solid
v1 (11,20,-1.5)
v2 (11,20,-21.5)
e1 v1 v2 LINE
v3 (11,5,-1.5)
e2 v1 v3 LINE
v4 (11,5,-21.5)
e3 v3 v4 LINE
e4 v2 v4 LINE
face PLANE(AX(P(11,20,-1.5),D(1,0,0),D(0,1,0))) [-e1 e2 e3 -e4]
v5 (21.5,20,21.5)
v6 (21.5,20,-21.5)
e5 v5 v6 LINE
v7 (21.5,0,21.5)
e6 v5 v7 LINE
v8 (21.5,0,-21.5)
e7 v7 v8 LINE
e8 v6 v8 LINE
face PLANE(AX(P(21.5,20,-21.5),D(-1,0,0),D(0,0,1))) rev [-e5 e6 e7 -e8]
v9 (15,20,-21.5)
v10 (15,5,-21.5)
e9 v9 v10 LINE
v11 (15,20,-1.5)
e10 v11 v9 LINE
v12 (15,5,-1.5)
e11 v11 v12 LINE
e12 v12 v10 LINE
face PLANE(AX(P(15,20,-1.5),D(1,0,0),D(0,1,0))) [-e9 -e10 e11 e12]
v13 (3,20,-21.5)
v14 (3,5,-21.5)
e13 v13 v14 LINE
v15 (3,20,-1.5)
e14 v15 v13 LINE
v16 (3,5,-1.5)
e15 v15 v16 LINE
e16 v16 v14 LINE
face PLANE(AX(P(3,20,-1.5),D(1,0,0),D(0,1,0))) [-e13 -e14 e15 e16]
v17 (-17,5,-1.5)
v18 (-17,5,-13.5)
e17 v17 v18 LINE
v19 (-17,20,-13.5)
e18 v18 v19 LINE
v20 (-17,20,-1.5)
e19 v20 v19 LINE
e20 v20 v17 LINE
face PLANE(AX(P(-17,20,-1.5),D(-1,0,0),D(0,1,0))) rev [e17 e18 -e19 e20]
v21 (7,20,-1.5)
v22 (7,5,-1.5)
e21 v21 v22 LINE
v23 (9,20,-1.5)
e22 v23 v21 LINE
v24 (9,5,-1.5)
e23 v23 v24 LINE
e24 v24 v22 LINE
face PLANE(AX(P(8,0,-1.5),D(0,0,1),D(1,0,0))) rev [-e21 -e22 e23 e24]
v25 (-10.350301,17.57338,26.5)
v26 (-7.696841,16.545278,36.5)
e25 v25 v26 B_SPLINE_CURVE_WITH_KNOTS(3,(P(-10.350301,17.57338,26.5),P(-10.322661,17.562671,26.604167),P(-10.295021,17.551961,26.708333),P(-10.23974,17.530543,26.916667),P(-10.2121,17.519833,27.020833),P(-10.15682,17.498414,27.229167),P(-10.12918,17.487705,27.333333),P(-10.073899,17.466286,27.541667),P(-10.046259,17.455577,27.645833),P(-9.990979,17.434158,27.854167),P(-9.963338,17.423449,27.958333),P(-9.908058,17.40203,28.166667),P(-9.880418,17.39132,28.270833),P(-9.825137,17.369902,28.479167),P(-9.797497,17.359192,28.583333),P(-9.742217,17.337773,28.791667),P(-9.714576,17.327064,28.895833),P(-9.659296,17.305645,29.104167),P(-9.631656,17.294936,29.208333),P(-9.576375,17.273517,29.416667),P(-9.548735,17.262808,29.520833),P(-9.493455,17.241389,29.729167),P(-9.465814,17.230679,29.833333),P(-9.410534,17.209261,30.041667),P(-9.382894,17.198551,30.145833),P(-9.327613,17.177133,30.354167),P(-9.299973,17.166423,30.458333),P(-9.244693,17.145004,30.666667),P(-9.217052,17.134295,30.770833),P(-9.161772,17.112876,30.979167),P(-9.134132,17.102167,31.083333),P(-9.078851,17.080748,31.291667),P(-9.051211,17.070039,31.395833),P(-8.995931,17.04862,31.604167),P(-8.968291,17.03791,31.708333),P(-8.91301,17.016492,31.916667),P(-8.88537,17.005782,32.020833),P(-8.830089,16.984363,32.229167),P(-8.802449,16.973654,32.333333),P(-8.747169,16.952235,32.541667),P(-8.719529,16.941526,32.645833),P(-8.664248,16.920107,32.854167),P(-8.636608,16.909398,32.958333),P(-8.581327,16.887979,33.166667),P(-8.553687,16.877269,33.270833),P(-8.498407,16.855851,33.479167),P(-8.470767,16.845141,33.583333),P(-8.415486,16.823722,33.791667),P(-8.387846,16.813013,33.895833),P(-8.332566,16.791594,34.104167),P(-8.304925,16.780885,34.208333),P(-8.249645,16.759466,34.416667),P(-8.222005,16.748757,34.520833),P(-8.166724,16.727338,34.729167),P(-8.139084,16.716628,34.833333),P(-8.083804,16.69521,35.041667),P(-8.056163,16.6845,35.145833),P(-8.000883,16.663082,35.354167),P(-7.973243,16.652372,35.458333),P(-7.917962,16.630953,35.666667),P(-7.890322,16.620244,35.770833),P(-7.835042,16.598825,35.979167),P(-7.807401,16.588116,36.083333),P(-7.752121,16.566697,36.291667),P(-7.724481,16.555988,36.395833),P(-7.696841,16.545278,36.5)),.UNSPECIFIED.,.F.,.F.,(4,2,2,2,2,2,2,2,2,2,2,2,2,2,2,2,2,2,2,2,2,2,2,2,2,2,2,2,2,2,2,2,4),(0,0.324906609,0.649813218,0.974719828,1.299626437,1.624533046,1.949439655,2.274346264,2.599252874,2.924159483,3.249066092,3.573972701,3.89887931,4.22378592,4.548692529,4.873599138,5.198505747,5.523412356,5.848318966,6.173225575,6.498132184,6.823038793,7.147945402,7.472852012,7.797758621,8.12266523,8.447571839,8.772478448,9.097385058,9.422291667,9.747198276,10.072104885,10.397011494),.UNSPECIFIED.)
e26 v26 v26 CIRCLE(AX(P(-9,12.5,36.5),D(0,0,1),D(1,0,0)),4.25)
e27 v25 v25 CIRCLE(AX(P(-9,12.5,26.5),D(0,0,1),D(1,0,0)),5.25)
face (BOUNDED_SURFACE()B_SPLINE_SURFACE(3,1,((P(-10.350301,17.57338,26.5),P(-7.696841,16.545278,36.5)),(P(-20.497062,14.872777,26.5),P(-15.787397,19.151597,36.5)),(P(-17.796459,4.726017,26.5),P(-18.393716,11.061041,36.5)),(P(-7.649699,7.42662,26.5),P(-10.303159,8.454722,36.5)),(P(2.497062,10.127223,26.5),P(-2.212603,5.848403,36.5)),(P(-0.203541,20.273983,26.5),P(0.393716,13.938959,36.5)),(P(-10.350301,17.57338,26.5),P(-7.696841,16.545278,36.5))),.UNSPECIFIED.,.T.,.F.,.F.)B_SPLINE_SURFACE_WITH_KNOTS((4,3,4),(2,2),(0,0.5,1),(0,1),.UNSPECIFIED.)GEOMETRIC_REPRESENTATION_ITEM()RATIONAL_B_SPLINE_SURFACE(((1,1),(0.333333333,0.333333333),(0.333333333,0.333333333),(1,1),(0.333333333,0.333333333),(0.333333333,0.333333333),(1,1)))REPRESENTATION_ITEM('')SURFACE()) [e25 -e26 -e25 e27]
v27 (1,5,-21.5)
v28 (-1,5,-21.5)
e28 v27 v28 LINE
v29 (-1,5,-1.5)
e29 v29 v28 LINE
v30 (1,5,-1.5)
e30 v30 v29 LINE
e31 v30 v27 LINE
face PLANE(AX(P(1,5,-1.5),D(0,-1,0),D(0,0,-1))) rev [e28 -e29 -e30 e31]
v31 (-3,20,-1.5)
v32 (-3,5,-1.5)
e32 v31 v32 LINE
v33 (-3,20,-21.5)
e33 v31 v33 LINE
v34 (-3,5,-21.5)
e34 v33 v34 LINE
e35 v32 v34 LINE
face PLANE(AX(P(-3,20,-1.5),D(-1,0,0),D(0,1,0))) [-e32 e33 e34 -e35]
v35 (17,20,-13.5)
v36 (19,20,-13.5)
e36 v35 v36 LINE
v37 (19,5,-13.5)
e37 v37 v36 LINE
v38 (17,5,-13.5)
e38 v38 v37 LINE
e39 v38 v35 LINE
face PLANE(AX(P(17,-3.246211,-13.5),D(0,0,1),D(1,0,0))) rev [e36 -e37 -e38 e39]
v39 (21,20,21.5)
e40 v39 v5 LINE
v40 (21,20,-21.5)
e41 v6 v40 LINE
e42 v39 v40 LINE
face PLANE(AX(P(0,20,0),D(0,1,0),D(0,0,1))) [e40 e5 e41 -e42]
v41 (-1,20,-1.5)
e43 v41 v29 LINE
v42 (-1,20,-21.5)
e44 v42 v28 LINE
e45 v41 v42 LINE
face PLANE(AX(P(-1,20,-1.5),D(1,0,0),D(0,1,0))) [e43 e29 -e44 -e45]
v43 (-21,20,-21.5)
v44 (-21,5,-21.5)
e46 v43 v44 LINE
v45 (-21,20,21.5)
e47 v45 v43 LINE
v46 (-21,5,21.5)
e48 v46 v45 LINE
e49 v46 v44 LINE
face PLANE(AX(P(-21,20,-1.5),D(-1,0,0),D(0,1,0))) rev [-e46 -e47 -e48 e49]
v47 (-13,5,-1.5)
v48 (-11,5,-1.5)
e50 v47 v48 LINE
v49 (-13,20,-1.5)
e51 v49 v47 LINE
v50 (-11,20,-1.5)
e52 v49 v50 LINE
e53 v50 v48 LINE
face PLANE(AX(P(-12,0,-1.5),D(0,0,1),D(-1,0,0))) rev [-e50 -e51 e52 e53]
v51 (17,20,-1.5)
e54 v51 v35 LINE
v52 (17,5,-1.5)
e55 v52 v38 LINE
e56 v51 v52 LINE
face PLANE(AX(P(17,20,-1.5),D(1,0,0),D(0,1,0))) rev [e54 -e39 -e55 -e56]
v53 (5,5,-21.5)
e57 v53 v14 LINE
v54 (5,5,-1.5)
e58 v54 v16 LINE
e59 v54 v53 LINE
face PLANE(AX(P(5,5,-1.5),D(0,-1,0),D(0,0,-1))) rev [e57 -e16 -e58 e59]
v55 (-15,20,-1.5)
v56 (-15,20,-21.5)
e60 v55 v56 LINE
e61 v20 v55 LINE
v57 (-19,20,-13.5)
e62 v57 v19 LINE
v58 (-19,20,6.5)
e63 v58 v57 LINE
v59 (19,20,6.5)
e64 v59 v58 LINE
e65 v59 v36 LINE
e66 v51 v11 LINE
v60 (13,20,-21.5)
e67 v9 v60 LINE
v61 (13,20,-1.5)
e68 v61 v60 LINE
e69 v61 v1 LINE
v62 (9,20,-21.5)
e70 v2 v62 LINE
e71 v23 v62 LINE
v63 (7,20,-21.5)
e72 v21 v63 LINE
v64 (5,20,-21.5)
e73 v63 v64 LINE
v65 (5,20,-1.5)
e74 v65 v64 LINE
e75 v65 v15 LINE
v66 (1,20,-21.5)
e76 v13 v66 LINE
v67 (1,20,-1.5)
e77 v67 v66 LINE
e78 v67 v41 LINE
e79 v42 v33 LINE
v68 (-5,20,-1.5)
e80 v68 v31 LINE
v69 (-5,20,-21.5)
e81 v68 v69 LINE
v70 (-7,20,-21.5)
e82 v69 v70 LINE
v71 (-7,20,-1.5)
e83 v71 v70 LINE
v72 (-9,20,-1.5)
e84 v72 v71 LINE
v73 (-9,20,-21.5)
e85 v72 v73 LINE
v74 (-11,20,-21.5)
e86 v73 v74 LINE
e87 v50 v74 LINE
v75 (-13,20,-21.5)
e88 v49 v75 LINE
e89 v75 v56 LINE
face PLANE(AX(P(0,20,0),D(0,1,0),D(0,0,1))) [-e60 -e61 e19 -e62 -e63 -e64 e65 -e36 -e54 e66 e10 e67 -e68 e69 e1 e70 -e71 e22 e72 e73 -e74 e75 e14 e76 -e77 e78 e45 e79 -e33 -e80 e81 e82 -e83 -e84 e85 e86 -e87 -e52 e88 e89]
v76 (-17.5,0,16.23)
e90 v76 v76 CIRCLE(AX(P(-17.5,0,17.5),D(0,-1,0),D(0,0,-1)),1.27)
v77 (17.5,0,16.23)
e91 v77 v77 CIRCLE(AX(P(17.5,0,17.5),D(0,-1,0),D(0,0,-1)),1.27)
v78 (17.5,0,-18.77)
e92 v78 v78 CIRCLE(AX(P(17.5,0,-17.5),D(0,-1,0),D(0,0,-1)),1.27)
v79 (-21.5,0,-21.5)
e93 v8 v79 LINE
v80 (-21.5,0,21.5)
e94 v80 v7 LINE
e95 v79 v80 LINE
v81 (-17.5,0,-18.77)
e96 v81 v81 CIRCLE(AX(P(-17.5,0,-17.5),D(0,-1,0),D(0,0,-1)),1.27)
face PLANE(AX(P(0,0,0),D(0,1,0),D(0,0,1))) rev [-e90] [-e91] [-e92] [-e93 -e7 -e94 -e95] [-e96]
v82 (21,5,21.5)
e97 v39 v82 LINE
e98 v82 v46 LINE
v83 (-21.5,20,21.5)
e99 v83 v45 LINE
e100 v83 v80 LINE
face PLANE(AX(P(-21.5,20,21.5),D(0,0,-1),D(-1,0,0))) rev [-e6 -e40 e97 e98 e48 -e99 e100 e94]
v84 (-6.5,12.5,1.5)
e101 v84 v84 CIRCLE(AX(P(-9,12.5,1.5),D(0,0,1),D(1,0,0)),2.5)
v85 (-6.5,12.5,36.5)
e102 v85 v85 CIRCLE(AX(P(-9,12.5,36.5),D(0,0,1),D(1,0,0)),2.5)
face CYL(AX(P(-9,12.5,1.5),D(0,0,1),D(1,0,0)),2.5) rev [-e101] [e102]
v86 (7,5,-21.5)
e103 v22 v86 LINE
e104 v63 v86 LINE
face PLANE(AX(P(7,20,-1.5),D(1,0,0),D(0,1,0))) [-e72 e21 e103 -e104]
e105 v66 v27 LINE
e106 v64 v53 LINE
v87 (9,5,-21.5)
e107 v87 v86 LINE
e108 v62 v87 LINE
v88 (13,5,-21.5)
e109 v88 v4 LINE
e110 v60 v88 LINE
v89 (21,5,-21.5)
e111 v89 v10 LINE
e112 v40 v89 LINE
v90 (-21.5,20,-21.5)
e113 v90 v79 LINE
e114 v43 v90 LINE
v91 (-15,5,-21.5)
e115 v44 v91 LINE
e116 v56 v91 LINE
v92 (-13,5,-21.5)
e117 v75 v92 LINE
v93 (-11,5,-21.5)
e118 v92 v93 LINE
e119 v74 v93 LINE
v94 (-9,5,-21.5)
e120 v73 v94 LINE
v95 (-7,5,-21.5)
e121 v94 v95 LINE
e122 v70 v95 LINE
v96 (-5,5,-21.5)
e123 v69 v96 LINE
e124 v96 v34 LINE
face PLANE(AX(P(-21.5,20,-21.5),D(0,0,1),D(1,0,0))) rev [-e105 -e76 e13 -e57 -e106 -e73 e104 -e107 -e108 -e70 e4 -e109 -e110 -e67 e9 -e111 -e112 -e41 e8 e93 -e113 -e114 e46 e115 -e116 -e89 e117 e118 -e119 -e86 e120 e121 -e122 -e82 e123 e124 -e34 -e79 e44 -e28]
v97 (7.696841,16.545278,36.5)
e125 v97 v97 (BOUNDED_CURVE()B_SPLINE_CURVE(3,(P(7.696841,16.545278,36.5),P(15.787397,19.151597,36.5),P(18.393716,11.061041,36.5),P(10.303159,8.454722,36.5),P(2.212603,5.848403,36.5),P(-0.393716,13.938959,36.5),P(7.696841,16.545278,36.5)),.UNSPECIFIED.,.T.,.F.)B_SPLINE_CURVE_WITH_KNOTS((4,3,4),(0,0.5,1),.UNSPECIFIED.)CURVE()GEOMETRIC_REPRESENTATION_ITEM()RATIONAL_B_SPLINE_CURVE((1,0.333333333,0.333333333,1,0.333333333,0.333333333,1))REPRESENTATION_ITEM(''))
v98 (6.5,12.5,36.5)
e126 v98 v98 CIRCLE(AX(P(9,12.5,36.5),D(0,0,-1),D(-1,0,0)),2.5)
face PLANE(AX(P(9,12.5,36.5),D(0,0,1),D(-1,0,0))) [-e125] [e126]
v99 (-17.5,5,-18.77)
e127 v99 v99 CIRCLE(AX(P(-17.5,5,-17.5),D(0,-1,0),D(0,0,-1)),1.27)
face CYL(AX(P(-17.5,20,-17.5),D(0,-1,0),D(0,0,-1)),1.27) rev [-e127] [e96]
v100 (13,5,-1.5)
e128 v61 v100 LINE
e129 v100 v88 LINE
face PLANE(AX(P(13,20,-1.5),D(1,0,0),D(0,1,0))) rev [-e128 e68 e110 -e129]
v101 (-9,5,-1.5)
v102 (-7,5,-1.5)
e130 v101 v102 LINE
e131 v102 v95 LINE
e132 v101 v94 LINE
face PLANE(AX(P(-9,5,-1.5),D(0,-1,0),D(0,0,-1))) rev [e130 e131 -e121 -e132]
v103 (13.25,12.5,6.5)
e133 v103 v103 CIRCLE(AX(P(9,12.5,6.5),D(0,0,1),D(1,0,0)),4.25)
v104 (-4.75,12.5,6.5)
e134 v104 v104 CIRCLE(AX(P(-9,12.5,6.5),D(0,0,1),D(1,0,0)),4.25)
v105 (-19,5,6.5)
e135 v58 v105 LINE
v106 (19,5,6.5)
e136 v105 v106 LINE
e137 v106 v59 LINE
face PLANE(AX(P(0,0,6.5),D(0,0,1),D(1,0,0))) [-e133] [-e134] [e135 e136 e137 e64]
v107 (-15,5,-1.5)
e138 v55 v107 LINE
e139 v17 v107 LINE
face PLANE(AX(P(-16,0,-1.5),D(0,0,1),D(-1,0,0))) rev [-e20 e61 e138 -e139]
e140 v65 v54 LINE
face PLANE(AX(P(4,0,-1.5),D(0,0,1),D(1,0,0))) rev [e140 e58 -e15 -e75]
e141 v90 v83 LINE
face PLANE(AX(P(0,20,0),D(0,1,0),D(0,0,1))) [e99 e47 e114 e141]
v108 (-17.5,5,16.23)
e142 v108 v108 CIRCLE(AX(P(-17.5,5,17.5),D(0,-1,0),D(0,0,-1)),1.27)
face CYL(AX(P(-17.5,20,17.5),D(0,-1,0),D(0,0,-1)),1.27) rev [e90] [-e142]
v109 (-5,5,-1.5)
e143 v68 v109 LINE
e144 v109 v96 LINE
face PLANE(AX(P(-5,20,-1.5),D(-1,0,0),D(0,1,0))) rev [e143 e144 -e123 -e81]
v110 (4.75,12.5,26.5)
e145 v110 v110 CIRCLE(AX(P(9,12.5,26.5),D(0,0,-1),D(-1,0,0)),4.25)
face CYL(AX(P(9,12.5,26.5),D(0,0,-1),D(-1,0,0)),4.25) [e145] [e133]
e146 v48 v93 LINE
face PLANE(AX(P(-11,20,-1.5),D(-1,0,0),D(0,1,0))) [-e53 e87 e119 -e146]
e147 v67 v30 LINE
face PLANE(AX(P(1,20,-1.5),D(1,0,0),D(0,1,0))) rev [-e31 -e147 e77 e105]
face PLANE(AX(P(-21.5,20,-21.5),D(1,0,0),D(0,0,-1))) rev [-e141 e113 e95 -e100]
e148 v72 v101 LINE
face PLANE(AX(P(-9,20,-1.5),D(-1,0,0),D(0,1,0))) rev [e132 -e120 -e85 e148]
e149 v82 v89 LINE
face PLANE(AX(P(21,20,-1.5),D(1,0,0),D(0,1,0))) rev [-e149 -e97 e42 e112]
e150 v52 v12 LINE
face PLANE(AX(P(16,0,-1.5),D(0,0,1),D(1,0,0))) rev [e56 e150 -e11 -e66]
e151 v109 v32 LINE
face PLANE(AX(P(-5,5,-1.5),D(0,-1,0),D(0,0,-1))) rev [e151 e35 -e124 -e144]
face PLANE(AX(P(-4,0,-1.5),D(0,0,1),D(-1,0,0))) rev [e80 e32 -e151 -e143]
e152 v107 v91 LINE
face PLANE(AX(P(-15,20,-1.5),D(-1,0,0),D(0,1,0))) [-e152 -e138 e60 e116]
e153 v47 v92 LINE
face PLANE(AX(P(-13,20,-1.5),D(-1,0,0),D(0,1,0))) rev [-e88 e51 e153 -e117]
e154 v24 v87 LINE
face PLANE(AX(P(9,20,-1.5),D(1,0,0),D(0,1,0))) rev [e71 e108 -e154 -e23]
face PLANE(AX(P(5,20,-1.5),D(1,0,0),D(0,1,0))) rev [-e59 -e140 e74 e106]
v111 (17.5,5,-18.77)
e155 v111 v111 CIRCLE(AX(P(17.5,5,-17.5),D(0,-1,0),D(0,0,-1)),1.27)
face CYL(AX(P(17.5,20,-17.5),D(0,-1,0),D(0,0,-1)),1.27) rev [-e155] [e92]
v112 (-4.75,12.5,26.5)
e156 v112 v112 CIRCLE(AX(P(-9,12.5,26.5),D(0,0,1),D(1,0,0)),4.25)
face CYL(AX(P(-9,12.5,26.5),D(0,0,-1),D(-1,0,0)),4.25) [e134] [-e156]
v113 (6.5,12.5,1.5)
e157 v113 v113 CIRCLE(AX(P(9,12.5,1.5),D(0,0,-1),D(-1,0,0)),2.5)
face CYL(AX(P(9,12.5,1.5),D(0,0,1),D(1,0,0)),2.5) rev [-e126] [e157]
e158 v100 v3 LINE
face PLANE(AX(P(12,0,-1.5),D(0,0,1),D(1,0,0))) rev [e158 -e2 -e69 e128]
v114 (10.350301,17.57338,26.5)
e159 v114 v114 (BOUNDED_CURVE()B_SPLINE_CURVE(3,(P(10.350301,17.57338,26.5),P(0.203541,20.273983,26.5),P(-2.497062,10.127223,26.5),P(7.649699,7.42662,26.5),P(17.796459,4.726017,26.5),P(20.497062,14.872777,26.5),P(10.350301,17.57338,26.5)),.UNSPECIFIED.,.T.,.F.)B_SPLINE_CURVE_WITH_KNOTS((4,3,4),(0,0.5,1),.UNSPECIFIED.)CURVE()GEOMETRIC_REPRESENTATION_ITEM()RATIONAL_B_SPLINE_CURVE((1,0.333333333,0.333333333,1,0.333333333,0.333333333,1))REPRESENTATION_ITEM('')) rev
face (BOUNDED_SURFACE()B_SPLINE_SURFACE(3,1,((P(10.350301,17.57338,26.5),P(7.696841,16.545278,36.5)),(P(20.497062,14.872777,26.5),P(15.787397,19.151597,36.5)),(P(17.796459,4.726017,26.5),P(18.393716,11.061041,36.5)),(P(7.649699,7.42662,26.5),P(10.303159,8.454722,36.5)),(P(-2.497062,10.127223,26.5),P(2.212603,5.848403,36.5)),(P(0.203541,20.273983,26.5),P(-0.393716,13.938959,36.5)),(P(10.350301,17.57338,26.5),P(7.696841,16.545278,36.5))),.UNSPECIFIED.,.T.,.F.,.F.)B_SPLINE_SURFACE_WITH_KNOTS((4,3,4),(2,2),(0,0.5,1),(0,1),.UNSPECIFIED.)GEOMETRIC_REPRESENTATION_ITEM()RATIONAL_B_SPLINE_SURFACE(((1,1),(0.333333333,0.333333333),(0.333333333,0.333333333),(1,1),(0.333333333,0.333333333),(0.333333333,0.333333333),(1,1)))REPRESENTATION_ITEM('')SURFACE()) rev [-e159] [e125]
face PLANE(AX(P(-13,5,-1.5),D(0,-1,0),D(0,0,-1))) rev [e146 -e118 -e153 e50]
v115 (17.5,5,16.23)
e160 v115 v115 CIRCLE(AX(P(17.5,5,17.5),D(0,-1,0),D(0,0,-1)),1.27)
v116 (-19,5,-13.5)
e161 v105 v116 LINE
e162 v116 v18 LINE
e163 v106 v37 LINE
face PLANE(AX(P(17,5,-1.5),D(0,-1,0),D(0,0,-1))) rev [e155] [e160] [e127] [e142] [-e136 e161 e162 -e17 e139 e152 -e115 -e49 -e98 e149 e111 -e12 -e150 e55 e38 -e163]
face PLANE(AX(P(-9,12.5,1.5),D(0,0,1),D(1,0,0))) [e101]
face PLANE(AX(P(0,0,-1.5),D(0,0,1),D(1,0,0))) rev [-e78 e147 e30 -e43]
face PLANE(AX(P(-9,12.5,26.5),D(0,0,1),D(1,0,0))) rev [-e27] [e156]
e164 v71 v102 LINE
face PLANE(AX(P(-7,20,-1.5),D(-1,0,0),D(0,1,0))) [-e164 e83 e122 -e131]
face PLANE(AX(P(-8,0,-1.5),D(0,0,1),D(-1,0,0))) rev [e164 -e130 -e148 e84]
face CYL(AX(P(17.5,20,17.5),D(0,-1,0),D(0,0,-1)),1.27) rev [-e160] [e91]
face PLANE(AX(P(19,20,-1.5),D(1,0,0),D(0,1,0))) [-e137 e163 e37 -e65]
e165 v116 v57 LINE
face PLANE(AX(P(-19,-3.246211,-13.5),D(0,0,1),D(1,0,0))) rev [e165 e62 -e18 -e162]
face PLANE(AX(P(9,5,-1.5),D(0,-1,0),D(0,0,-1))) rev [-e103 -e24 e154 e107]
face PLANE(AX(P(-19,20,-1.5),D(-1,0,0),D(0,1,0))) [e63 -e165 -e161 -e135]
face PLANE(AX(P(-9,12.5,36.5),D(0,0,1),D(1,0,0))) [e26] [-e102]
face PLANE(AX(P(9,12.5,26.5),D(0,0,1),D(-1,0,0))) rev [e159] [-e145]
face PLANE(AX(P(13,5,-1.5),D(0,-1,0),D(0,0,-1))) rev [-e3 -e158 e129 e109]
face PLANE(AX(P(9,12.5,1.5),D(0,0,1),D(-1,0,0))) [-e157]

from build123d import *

# Parameters (mm, degrees)
SKETCH1_W               = 43
SKETCH1_H               = 43
BOSS_EXTRUDE1_DEPTH     = 20
SKETCH2_W               = 2
SKETCH2_H               = 15
CUT_EXTRUDE1_DEPTH      = 20
LPATTERN1_COUNT         = 6
LPATTERN1_PITCH         = 4
MIRROR1_COPY_1_SKETCH_W = 2
MIRROR1_COPY_1_SKETCH_H = 15
MIRROR1_COPY_1_DEPTH    = 20
MIRROR1_COPY_2_SKETCH_W = 2
MIRROR1_COPY_2_SKETCH_H = 15
MIRROR1_COPY_2_DEPTH    = 20
MIRROR1_COPY_3_SKETCH_W = 2
MIRROR1_COPY_3_SKETCH_H = 15
MIRROR1_COPY_3_DEPTH    = 20
MIRROR1_COPY_4_SKETCH_W = 2
MIRROR1_COPY_4_SKETCH_H = 15
MIRROR1_COPY_4_DEPTH    = 20
MIRROR1_COPY_5_SKETCH_W = 2
MIRROR1_COPY_5_SKETCH_H = 15
MIRROR1_COPY_5_DEPTH    = 20
MIRROR1_COPY_6_SKETCH_W = 2
MIRROR1_COPY_6_SKETCH_H = 15
MIRROR1_COPY_6_DEPTH    = 20
SKETCH7_W               = 2
SKETCH7_H               = 15
CUT_EXTRUDE6_DEPTH      = 38.299463803
SKETCH8_W               = 38
SKETCH8_H               = 15
CUT_EXTRUDE7_DEPTH      = 15
SKETCH9_R               = 4.25
BOSS_EXTRUDE2_DEPTH     = 20
SKETCH12_R              = 2.5
CUT_EXTRUDE8_DEPTH      = 35
SKETCH13_R              = 1.27
CUT_EXTRUDE9_DEPTH      = 47.845490789
SKETCH14_W              = 2
SKETCH14_H              = 8
CUT_EXTRUDE10_DEPTH     = 15


with BuildPart() as part:
    # Sketch1 → Boss-Extrude1 (new body)
    with BuildSketch(Plane(origin=(0, 0, 0), x_dir=(1, 0, 0), z_dir=(0, 1, 0))):
        Rectangle(SKETCH1_W, SKETCH1_H)
    extrude(amount=BOSS_EXTRUDE1_DEPTH)

    # Sketch2 → Cut-Extrude1 (cut)
    with BuildSketch(Plane(origin=(0, 0, -21.5), x_dir=(-1, 0, 0), z_dir=(0, 0, -1))):
        with Locations((0, 12.5)):
            Rectangle(SKETCH2_W, SKETCH2_H)
    cut_extrude1 = extrude(amount=-CUT_EXTRUDE1_DEPTH, mode=Mode.SUBTRACT)

    # LPattern1: Cut-Extrude1 ×6
    with Locations(*[(i * LPATTERN1_PITCH, 0, 0) for i in range(1, LPATTERN1_COUNT)]):
        add(cut_extrude1, mode=Mode.SUBTRACT)

    # Mirror1 copy 1 sketch → Mirror1 copy 1 (cut)
    with BuildSketch(Plane(origin=(-4, 0, -21.5), x_dir=(1, 0, 0), z_dir=(0, 0, -1))):
        with Locations((0, -12.5)):
            Rectangle(MIRROR1_COPY_1_SKETCH_W, MIRROR1_COPY_1_SKETCH_H)
    extrude(amount=-MIRROR1_COPY_1_DEPTH, mode=Mode.SUBTRACT)

    # Mirror1 copy 2 sketch → Mirror1 copy 2 (cut)
    with BuildSketch(Plane(origin=(-8, 0, -21.5), x_dir=(1, 0, 0), z_dir=(0, 0, -1))):
        with Locations((0, -12.5)):
            Rectangle(MIRROR1_COPY_2_SKETCH_W, MIRROR1_COPY_2_SKETCH_H)
    extrude(amount=-MIRROR1_COPY_2_DEPTH, mode=Mode.SUBTRACT)

    # Mirror1 copy 3 sketch → Mirror1 copy 3 (cut)
    with BuildSketch(Plane(origin=(-12, 0, -21.5), x_dir=(1, 0, 0), z_dir=(0, 0, -1))):
        with Locations((0, -12.5)):
            Rectangle(MIRROR1_COPY_3_SKETCH_W, MIRROR1_COPY_3_SKETCH_H)
    extrude(amount=-MIRROR1_COPY_3_DEPTH, mode=Mode.SUBTRACT)

    # Mirror1 copy 4 sketch → Mirror1 copy 4 (cut)
    with BuildSketch(Plane(origin=(-16, 0, -21.5), x_dir=(1, 0, 0), z_dir=(0, 0, -1))):
        with Locations((0, -12.5)):
            Rectangle(MIRROR1_COPY_4_SKETCH_W, MIRROR1_COPY_4_SKETCH_H)
    extrude(amount=-MIRROR1_COPY_4_DEPTH, mode=Mode.SUBTRACT)

    # Mirror1 copy 5 sketch → Mirror1 copy 5 (cut)
    with BuildSketch(Plane(origin=(-20, 0, -21.5), x_dir=(1, 0, 0), z_dir=(0, 0, -1))):
        with Locations((0, -12.5)):
            Rectangle(MIRROR1_COPY_5_SKETCH_W, MIRROR1_COPY_5_SKETCH_H)
    extrude(amount=-MIRROR1_COPY_5_DEPTH, mode=Mode.SUBTRACT)

    # Mirror1 copy 6 sketch → Mirror1 copy 6 (cut)
    with BuildSketch(Plane(origin=(0, 0, -21.5), x_dir=(1, 0, 0), z_dir=(0, 0, -1))):
        with Locations((0, -12.5)):
            Rectangle(MIRROR1_COPY_6_SKETCH_W, MIRROR1_COPY_6_SKETCH_H)
    extrude(amount=-MIRROR1_COPY_6_DEPTH, mode=Mode.SUBTRACT)

    # Sketch7 → Cut-Extrude6 (cut, through all)
    with BuildSketch(Plane(origin=(0, 0, -1.5), x_dir=(-1, 0, 0), z_dir=(0, 0, -1))):
        with Locations((20, 12.5)):
            Rectangle(SKETCH7_W, SKETCH7_H)
        with Locations((-20, 12.5)):
            Rectangle(SKETCH7_W, SKETCH7_H)
    extrude(amount=-CUT_EXTRUDE6_DEPTH, mode=Mode.SUBTRACT)

    # Sketch8 → Cut-Extrude7 (cut)
    with BuildSketch(Plane.XY.offset(21.5)):
        with Locations((0, 12.5)):
            Rectangle(SKETCH8_W, SKETCH8_H)
    extrude(amount=-CUT_EXTRUDE7_DEPTH, mode=Mode.SUBTRACT)

    # Sketch9 → Boss-Extrude2 (add)
    with BuildSketch(Plane.XY.offset(6.5)):
        with Locations((-9, 12.5)):
            Circle(SKETCH9_R)
    boss_extrude2 = extrude(amount=BOSS_EXTRUDE2_DEPTH)

    # Loft1: read off the stored shape, not the designer's step
    # Loft1: loft between two sections, ruled curve by curve
    loft1_from = [
        Edge.make_bspline([(-10.350301356, 17.57338016, 26.5), (-20.497061676, 14.872777448, 26.5), (-17.796458964, 4.726017128, 26.5), (-7.649698644, 7.42661984, 26.5), (2.497061676, 10.127222552, 26.5), (-0.203541036, 20.273982872, 26.5), (-10.350301356, 17.57338016, 26.5)], [0, 0, 0, 0, 0.5, 0.5, 0.5, 1, 1, 1, 1], 3, [1, 0.333333333, 0.333333333, 1, 0.333333333, 0.333333333, 1]),
    ]
    loft1_to = [
        Edge.make_bspline([(-7.69684054, 16.545278164, 36.5), (-15.787396868, 19.151597083, 36.5), (-18.393715787, 11.061040755, 36.5), (-10.30315946, 8.454721836, 36.5), (-2.212603132, 5.848402917, 36.5), (0.393715787, 13.938959245, 36.5), (-7.69684054, 16.545278164, 36.5)], [0, 0, 0, 0, 0.5, 0.5, 0.5, 1, 1, 1, 1], 3, [1, 0.333333333, 0.333333333, 1, 0.333333333, 0.333333333, 1]),
    ]
    loft1 = Solid(Shell([*[Face.make_surface_from_curves(loft1_from[k], loft1_to[k]) for k in range(1)], Face(Wire(loft1_from)), Face(Wire(loft1_to))]))
    add(loft1)

    # Sketch12 → Cut-Extrude8 (cut)
    with BuildSketch(Plane.XY.offset(36.5)):
        with Locations((-9, 12.5)):
            Circle(SKETCH12_R)
    cut_extrude8 = extrude(amount=-CUT_EXTRUDE8_DEPTH, mode=Mode.SUBTRACT)

    # Mirror3: Boss-Extrude2, Loft1, Cut-Extrude8 across plane
    add(boss_extrude2.mirror(Plane(origin=(0, 0, 0), x_dir=(0, 0, 1), z_dir=(1, 0, 0))))
    add(loft1.mirror(Plane(origin=(0, 0, 0), x_dir=(0, 0, 1), z_dir=(1, 0, 0))))
    add(cut_extrude8.mirror(Plane(origin=(0, 0, 0), x_dir=(0, 0, 1), z_dir=(1, 0, 0))), mode=Mode.SUBTRACT)

    # Sketch13 → Cut-Extrude9 (cut, through all)
    with BuildSketch(Plane.XZ):
        with Locations(Location((17.5, 17.5, 0), (0, 0, 270))):
            Circle(SKETCH13_R)
        with Locations(Location((-17.5, 17.5, 0), (0, 0, 270))):
            Circle(SKETCH13_R)
        with Locations(Location((-17.5, -17.5, 0), (0, 0, 270))):
            Circle(SKETCH13_R)
        with Locations(Location((17.5, -17.5, 0), (0, 0, 270))):
            Circle(SKETCH13_R)
    extrude(amount=-CUT_EXTRUDE9_DEPTH, mode=Mode.SUBTRACT)

    # Sketch14 → Cut-Extrude10 (cut)
    with BuildSketch(Plane(origin=(0, 20, 0), x_dir=(1, 0, 0), z_dir=(0, 1, 0))):
        with Locations((-18, 17.5)):
            Rectangle(SKETCH14_W, SKETCH14_H)
        with Locations((18, 17.5)):
            Rectangle(SKETCH14_W, SKETCH14_H)
    extrude(amount=-CUT_EXTRUDE10_DEPTH, mode=Mode.SUBTRACT)


solid = part.part
